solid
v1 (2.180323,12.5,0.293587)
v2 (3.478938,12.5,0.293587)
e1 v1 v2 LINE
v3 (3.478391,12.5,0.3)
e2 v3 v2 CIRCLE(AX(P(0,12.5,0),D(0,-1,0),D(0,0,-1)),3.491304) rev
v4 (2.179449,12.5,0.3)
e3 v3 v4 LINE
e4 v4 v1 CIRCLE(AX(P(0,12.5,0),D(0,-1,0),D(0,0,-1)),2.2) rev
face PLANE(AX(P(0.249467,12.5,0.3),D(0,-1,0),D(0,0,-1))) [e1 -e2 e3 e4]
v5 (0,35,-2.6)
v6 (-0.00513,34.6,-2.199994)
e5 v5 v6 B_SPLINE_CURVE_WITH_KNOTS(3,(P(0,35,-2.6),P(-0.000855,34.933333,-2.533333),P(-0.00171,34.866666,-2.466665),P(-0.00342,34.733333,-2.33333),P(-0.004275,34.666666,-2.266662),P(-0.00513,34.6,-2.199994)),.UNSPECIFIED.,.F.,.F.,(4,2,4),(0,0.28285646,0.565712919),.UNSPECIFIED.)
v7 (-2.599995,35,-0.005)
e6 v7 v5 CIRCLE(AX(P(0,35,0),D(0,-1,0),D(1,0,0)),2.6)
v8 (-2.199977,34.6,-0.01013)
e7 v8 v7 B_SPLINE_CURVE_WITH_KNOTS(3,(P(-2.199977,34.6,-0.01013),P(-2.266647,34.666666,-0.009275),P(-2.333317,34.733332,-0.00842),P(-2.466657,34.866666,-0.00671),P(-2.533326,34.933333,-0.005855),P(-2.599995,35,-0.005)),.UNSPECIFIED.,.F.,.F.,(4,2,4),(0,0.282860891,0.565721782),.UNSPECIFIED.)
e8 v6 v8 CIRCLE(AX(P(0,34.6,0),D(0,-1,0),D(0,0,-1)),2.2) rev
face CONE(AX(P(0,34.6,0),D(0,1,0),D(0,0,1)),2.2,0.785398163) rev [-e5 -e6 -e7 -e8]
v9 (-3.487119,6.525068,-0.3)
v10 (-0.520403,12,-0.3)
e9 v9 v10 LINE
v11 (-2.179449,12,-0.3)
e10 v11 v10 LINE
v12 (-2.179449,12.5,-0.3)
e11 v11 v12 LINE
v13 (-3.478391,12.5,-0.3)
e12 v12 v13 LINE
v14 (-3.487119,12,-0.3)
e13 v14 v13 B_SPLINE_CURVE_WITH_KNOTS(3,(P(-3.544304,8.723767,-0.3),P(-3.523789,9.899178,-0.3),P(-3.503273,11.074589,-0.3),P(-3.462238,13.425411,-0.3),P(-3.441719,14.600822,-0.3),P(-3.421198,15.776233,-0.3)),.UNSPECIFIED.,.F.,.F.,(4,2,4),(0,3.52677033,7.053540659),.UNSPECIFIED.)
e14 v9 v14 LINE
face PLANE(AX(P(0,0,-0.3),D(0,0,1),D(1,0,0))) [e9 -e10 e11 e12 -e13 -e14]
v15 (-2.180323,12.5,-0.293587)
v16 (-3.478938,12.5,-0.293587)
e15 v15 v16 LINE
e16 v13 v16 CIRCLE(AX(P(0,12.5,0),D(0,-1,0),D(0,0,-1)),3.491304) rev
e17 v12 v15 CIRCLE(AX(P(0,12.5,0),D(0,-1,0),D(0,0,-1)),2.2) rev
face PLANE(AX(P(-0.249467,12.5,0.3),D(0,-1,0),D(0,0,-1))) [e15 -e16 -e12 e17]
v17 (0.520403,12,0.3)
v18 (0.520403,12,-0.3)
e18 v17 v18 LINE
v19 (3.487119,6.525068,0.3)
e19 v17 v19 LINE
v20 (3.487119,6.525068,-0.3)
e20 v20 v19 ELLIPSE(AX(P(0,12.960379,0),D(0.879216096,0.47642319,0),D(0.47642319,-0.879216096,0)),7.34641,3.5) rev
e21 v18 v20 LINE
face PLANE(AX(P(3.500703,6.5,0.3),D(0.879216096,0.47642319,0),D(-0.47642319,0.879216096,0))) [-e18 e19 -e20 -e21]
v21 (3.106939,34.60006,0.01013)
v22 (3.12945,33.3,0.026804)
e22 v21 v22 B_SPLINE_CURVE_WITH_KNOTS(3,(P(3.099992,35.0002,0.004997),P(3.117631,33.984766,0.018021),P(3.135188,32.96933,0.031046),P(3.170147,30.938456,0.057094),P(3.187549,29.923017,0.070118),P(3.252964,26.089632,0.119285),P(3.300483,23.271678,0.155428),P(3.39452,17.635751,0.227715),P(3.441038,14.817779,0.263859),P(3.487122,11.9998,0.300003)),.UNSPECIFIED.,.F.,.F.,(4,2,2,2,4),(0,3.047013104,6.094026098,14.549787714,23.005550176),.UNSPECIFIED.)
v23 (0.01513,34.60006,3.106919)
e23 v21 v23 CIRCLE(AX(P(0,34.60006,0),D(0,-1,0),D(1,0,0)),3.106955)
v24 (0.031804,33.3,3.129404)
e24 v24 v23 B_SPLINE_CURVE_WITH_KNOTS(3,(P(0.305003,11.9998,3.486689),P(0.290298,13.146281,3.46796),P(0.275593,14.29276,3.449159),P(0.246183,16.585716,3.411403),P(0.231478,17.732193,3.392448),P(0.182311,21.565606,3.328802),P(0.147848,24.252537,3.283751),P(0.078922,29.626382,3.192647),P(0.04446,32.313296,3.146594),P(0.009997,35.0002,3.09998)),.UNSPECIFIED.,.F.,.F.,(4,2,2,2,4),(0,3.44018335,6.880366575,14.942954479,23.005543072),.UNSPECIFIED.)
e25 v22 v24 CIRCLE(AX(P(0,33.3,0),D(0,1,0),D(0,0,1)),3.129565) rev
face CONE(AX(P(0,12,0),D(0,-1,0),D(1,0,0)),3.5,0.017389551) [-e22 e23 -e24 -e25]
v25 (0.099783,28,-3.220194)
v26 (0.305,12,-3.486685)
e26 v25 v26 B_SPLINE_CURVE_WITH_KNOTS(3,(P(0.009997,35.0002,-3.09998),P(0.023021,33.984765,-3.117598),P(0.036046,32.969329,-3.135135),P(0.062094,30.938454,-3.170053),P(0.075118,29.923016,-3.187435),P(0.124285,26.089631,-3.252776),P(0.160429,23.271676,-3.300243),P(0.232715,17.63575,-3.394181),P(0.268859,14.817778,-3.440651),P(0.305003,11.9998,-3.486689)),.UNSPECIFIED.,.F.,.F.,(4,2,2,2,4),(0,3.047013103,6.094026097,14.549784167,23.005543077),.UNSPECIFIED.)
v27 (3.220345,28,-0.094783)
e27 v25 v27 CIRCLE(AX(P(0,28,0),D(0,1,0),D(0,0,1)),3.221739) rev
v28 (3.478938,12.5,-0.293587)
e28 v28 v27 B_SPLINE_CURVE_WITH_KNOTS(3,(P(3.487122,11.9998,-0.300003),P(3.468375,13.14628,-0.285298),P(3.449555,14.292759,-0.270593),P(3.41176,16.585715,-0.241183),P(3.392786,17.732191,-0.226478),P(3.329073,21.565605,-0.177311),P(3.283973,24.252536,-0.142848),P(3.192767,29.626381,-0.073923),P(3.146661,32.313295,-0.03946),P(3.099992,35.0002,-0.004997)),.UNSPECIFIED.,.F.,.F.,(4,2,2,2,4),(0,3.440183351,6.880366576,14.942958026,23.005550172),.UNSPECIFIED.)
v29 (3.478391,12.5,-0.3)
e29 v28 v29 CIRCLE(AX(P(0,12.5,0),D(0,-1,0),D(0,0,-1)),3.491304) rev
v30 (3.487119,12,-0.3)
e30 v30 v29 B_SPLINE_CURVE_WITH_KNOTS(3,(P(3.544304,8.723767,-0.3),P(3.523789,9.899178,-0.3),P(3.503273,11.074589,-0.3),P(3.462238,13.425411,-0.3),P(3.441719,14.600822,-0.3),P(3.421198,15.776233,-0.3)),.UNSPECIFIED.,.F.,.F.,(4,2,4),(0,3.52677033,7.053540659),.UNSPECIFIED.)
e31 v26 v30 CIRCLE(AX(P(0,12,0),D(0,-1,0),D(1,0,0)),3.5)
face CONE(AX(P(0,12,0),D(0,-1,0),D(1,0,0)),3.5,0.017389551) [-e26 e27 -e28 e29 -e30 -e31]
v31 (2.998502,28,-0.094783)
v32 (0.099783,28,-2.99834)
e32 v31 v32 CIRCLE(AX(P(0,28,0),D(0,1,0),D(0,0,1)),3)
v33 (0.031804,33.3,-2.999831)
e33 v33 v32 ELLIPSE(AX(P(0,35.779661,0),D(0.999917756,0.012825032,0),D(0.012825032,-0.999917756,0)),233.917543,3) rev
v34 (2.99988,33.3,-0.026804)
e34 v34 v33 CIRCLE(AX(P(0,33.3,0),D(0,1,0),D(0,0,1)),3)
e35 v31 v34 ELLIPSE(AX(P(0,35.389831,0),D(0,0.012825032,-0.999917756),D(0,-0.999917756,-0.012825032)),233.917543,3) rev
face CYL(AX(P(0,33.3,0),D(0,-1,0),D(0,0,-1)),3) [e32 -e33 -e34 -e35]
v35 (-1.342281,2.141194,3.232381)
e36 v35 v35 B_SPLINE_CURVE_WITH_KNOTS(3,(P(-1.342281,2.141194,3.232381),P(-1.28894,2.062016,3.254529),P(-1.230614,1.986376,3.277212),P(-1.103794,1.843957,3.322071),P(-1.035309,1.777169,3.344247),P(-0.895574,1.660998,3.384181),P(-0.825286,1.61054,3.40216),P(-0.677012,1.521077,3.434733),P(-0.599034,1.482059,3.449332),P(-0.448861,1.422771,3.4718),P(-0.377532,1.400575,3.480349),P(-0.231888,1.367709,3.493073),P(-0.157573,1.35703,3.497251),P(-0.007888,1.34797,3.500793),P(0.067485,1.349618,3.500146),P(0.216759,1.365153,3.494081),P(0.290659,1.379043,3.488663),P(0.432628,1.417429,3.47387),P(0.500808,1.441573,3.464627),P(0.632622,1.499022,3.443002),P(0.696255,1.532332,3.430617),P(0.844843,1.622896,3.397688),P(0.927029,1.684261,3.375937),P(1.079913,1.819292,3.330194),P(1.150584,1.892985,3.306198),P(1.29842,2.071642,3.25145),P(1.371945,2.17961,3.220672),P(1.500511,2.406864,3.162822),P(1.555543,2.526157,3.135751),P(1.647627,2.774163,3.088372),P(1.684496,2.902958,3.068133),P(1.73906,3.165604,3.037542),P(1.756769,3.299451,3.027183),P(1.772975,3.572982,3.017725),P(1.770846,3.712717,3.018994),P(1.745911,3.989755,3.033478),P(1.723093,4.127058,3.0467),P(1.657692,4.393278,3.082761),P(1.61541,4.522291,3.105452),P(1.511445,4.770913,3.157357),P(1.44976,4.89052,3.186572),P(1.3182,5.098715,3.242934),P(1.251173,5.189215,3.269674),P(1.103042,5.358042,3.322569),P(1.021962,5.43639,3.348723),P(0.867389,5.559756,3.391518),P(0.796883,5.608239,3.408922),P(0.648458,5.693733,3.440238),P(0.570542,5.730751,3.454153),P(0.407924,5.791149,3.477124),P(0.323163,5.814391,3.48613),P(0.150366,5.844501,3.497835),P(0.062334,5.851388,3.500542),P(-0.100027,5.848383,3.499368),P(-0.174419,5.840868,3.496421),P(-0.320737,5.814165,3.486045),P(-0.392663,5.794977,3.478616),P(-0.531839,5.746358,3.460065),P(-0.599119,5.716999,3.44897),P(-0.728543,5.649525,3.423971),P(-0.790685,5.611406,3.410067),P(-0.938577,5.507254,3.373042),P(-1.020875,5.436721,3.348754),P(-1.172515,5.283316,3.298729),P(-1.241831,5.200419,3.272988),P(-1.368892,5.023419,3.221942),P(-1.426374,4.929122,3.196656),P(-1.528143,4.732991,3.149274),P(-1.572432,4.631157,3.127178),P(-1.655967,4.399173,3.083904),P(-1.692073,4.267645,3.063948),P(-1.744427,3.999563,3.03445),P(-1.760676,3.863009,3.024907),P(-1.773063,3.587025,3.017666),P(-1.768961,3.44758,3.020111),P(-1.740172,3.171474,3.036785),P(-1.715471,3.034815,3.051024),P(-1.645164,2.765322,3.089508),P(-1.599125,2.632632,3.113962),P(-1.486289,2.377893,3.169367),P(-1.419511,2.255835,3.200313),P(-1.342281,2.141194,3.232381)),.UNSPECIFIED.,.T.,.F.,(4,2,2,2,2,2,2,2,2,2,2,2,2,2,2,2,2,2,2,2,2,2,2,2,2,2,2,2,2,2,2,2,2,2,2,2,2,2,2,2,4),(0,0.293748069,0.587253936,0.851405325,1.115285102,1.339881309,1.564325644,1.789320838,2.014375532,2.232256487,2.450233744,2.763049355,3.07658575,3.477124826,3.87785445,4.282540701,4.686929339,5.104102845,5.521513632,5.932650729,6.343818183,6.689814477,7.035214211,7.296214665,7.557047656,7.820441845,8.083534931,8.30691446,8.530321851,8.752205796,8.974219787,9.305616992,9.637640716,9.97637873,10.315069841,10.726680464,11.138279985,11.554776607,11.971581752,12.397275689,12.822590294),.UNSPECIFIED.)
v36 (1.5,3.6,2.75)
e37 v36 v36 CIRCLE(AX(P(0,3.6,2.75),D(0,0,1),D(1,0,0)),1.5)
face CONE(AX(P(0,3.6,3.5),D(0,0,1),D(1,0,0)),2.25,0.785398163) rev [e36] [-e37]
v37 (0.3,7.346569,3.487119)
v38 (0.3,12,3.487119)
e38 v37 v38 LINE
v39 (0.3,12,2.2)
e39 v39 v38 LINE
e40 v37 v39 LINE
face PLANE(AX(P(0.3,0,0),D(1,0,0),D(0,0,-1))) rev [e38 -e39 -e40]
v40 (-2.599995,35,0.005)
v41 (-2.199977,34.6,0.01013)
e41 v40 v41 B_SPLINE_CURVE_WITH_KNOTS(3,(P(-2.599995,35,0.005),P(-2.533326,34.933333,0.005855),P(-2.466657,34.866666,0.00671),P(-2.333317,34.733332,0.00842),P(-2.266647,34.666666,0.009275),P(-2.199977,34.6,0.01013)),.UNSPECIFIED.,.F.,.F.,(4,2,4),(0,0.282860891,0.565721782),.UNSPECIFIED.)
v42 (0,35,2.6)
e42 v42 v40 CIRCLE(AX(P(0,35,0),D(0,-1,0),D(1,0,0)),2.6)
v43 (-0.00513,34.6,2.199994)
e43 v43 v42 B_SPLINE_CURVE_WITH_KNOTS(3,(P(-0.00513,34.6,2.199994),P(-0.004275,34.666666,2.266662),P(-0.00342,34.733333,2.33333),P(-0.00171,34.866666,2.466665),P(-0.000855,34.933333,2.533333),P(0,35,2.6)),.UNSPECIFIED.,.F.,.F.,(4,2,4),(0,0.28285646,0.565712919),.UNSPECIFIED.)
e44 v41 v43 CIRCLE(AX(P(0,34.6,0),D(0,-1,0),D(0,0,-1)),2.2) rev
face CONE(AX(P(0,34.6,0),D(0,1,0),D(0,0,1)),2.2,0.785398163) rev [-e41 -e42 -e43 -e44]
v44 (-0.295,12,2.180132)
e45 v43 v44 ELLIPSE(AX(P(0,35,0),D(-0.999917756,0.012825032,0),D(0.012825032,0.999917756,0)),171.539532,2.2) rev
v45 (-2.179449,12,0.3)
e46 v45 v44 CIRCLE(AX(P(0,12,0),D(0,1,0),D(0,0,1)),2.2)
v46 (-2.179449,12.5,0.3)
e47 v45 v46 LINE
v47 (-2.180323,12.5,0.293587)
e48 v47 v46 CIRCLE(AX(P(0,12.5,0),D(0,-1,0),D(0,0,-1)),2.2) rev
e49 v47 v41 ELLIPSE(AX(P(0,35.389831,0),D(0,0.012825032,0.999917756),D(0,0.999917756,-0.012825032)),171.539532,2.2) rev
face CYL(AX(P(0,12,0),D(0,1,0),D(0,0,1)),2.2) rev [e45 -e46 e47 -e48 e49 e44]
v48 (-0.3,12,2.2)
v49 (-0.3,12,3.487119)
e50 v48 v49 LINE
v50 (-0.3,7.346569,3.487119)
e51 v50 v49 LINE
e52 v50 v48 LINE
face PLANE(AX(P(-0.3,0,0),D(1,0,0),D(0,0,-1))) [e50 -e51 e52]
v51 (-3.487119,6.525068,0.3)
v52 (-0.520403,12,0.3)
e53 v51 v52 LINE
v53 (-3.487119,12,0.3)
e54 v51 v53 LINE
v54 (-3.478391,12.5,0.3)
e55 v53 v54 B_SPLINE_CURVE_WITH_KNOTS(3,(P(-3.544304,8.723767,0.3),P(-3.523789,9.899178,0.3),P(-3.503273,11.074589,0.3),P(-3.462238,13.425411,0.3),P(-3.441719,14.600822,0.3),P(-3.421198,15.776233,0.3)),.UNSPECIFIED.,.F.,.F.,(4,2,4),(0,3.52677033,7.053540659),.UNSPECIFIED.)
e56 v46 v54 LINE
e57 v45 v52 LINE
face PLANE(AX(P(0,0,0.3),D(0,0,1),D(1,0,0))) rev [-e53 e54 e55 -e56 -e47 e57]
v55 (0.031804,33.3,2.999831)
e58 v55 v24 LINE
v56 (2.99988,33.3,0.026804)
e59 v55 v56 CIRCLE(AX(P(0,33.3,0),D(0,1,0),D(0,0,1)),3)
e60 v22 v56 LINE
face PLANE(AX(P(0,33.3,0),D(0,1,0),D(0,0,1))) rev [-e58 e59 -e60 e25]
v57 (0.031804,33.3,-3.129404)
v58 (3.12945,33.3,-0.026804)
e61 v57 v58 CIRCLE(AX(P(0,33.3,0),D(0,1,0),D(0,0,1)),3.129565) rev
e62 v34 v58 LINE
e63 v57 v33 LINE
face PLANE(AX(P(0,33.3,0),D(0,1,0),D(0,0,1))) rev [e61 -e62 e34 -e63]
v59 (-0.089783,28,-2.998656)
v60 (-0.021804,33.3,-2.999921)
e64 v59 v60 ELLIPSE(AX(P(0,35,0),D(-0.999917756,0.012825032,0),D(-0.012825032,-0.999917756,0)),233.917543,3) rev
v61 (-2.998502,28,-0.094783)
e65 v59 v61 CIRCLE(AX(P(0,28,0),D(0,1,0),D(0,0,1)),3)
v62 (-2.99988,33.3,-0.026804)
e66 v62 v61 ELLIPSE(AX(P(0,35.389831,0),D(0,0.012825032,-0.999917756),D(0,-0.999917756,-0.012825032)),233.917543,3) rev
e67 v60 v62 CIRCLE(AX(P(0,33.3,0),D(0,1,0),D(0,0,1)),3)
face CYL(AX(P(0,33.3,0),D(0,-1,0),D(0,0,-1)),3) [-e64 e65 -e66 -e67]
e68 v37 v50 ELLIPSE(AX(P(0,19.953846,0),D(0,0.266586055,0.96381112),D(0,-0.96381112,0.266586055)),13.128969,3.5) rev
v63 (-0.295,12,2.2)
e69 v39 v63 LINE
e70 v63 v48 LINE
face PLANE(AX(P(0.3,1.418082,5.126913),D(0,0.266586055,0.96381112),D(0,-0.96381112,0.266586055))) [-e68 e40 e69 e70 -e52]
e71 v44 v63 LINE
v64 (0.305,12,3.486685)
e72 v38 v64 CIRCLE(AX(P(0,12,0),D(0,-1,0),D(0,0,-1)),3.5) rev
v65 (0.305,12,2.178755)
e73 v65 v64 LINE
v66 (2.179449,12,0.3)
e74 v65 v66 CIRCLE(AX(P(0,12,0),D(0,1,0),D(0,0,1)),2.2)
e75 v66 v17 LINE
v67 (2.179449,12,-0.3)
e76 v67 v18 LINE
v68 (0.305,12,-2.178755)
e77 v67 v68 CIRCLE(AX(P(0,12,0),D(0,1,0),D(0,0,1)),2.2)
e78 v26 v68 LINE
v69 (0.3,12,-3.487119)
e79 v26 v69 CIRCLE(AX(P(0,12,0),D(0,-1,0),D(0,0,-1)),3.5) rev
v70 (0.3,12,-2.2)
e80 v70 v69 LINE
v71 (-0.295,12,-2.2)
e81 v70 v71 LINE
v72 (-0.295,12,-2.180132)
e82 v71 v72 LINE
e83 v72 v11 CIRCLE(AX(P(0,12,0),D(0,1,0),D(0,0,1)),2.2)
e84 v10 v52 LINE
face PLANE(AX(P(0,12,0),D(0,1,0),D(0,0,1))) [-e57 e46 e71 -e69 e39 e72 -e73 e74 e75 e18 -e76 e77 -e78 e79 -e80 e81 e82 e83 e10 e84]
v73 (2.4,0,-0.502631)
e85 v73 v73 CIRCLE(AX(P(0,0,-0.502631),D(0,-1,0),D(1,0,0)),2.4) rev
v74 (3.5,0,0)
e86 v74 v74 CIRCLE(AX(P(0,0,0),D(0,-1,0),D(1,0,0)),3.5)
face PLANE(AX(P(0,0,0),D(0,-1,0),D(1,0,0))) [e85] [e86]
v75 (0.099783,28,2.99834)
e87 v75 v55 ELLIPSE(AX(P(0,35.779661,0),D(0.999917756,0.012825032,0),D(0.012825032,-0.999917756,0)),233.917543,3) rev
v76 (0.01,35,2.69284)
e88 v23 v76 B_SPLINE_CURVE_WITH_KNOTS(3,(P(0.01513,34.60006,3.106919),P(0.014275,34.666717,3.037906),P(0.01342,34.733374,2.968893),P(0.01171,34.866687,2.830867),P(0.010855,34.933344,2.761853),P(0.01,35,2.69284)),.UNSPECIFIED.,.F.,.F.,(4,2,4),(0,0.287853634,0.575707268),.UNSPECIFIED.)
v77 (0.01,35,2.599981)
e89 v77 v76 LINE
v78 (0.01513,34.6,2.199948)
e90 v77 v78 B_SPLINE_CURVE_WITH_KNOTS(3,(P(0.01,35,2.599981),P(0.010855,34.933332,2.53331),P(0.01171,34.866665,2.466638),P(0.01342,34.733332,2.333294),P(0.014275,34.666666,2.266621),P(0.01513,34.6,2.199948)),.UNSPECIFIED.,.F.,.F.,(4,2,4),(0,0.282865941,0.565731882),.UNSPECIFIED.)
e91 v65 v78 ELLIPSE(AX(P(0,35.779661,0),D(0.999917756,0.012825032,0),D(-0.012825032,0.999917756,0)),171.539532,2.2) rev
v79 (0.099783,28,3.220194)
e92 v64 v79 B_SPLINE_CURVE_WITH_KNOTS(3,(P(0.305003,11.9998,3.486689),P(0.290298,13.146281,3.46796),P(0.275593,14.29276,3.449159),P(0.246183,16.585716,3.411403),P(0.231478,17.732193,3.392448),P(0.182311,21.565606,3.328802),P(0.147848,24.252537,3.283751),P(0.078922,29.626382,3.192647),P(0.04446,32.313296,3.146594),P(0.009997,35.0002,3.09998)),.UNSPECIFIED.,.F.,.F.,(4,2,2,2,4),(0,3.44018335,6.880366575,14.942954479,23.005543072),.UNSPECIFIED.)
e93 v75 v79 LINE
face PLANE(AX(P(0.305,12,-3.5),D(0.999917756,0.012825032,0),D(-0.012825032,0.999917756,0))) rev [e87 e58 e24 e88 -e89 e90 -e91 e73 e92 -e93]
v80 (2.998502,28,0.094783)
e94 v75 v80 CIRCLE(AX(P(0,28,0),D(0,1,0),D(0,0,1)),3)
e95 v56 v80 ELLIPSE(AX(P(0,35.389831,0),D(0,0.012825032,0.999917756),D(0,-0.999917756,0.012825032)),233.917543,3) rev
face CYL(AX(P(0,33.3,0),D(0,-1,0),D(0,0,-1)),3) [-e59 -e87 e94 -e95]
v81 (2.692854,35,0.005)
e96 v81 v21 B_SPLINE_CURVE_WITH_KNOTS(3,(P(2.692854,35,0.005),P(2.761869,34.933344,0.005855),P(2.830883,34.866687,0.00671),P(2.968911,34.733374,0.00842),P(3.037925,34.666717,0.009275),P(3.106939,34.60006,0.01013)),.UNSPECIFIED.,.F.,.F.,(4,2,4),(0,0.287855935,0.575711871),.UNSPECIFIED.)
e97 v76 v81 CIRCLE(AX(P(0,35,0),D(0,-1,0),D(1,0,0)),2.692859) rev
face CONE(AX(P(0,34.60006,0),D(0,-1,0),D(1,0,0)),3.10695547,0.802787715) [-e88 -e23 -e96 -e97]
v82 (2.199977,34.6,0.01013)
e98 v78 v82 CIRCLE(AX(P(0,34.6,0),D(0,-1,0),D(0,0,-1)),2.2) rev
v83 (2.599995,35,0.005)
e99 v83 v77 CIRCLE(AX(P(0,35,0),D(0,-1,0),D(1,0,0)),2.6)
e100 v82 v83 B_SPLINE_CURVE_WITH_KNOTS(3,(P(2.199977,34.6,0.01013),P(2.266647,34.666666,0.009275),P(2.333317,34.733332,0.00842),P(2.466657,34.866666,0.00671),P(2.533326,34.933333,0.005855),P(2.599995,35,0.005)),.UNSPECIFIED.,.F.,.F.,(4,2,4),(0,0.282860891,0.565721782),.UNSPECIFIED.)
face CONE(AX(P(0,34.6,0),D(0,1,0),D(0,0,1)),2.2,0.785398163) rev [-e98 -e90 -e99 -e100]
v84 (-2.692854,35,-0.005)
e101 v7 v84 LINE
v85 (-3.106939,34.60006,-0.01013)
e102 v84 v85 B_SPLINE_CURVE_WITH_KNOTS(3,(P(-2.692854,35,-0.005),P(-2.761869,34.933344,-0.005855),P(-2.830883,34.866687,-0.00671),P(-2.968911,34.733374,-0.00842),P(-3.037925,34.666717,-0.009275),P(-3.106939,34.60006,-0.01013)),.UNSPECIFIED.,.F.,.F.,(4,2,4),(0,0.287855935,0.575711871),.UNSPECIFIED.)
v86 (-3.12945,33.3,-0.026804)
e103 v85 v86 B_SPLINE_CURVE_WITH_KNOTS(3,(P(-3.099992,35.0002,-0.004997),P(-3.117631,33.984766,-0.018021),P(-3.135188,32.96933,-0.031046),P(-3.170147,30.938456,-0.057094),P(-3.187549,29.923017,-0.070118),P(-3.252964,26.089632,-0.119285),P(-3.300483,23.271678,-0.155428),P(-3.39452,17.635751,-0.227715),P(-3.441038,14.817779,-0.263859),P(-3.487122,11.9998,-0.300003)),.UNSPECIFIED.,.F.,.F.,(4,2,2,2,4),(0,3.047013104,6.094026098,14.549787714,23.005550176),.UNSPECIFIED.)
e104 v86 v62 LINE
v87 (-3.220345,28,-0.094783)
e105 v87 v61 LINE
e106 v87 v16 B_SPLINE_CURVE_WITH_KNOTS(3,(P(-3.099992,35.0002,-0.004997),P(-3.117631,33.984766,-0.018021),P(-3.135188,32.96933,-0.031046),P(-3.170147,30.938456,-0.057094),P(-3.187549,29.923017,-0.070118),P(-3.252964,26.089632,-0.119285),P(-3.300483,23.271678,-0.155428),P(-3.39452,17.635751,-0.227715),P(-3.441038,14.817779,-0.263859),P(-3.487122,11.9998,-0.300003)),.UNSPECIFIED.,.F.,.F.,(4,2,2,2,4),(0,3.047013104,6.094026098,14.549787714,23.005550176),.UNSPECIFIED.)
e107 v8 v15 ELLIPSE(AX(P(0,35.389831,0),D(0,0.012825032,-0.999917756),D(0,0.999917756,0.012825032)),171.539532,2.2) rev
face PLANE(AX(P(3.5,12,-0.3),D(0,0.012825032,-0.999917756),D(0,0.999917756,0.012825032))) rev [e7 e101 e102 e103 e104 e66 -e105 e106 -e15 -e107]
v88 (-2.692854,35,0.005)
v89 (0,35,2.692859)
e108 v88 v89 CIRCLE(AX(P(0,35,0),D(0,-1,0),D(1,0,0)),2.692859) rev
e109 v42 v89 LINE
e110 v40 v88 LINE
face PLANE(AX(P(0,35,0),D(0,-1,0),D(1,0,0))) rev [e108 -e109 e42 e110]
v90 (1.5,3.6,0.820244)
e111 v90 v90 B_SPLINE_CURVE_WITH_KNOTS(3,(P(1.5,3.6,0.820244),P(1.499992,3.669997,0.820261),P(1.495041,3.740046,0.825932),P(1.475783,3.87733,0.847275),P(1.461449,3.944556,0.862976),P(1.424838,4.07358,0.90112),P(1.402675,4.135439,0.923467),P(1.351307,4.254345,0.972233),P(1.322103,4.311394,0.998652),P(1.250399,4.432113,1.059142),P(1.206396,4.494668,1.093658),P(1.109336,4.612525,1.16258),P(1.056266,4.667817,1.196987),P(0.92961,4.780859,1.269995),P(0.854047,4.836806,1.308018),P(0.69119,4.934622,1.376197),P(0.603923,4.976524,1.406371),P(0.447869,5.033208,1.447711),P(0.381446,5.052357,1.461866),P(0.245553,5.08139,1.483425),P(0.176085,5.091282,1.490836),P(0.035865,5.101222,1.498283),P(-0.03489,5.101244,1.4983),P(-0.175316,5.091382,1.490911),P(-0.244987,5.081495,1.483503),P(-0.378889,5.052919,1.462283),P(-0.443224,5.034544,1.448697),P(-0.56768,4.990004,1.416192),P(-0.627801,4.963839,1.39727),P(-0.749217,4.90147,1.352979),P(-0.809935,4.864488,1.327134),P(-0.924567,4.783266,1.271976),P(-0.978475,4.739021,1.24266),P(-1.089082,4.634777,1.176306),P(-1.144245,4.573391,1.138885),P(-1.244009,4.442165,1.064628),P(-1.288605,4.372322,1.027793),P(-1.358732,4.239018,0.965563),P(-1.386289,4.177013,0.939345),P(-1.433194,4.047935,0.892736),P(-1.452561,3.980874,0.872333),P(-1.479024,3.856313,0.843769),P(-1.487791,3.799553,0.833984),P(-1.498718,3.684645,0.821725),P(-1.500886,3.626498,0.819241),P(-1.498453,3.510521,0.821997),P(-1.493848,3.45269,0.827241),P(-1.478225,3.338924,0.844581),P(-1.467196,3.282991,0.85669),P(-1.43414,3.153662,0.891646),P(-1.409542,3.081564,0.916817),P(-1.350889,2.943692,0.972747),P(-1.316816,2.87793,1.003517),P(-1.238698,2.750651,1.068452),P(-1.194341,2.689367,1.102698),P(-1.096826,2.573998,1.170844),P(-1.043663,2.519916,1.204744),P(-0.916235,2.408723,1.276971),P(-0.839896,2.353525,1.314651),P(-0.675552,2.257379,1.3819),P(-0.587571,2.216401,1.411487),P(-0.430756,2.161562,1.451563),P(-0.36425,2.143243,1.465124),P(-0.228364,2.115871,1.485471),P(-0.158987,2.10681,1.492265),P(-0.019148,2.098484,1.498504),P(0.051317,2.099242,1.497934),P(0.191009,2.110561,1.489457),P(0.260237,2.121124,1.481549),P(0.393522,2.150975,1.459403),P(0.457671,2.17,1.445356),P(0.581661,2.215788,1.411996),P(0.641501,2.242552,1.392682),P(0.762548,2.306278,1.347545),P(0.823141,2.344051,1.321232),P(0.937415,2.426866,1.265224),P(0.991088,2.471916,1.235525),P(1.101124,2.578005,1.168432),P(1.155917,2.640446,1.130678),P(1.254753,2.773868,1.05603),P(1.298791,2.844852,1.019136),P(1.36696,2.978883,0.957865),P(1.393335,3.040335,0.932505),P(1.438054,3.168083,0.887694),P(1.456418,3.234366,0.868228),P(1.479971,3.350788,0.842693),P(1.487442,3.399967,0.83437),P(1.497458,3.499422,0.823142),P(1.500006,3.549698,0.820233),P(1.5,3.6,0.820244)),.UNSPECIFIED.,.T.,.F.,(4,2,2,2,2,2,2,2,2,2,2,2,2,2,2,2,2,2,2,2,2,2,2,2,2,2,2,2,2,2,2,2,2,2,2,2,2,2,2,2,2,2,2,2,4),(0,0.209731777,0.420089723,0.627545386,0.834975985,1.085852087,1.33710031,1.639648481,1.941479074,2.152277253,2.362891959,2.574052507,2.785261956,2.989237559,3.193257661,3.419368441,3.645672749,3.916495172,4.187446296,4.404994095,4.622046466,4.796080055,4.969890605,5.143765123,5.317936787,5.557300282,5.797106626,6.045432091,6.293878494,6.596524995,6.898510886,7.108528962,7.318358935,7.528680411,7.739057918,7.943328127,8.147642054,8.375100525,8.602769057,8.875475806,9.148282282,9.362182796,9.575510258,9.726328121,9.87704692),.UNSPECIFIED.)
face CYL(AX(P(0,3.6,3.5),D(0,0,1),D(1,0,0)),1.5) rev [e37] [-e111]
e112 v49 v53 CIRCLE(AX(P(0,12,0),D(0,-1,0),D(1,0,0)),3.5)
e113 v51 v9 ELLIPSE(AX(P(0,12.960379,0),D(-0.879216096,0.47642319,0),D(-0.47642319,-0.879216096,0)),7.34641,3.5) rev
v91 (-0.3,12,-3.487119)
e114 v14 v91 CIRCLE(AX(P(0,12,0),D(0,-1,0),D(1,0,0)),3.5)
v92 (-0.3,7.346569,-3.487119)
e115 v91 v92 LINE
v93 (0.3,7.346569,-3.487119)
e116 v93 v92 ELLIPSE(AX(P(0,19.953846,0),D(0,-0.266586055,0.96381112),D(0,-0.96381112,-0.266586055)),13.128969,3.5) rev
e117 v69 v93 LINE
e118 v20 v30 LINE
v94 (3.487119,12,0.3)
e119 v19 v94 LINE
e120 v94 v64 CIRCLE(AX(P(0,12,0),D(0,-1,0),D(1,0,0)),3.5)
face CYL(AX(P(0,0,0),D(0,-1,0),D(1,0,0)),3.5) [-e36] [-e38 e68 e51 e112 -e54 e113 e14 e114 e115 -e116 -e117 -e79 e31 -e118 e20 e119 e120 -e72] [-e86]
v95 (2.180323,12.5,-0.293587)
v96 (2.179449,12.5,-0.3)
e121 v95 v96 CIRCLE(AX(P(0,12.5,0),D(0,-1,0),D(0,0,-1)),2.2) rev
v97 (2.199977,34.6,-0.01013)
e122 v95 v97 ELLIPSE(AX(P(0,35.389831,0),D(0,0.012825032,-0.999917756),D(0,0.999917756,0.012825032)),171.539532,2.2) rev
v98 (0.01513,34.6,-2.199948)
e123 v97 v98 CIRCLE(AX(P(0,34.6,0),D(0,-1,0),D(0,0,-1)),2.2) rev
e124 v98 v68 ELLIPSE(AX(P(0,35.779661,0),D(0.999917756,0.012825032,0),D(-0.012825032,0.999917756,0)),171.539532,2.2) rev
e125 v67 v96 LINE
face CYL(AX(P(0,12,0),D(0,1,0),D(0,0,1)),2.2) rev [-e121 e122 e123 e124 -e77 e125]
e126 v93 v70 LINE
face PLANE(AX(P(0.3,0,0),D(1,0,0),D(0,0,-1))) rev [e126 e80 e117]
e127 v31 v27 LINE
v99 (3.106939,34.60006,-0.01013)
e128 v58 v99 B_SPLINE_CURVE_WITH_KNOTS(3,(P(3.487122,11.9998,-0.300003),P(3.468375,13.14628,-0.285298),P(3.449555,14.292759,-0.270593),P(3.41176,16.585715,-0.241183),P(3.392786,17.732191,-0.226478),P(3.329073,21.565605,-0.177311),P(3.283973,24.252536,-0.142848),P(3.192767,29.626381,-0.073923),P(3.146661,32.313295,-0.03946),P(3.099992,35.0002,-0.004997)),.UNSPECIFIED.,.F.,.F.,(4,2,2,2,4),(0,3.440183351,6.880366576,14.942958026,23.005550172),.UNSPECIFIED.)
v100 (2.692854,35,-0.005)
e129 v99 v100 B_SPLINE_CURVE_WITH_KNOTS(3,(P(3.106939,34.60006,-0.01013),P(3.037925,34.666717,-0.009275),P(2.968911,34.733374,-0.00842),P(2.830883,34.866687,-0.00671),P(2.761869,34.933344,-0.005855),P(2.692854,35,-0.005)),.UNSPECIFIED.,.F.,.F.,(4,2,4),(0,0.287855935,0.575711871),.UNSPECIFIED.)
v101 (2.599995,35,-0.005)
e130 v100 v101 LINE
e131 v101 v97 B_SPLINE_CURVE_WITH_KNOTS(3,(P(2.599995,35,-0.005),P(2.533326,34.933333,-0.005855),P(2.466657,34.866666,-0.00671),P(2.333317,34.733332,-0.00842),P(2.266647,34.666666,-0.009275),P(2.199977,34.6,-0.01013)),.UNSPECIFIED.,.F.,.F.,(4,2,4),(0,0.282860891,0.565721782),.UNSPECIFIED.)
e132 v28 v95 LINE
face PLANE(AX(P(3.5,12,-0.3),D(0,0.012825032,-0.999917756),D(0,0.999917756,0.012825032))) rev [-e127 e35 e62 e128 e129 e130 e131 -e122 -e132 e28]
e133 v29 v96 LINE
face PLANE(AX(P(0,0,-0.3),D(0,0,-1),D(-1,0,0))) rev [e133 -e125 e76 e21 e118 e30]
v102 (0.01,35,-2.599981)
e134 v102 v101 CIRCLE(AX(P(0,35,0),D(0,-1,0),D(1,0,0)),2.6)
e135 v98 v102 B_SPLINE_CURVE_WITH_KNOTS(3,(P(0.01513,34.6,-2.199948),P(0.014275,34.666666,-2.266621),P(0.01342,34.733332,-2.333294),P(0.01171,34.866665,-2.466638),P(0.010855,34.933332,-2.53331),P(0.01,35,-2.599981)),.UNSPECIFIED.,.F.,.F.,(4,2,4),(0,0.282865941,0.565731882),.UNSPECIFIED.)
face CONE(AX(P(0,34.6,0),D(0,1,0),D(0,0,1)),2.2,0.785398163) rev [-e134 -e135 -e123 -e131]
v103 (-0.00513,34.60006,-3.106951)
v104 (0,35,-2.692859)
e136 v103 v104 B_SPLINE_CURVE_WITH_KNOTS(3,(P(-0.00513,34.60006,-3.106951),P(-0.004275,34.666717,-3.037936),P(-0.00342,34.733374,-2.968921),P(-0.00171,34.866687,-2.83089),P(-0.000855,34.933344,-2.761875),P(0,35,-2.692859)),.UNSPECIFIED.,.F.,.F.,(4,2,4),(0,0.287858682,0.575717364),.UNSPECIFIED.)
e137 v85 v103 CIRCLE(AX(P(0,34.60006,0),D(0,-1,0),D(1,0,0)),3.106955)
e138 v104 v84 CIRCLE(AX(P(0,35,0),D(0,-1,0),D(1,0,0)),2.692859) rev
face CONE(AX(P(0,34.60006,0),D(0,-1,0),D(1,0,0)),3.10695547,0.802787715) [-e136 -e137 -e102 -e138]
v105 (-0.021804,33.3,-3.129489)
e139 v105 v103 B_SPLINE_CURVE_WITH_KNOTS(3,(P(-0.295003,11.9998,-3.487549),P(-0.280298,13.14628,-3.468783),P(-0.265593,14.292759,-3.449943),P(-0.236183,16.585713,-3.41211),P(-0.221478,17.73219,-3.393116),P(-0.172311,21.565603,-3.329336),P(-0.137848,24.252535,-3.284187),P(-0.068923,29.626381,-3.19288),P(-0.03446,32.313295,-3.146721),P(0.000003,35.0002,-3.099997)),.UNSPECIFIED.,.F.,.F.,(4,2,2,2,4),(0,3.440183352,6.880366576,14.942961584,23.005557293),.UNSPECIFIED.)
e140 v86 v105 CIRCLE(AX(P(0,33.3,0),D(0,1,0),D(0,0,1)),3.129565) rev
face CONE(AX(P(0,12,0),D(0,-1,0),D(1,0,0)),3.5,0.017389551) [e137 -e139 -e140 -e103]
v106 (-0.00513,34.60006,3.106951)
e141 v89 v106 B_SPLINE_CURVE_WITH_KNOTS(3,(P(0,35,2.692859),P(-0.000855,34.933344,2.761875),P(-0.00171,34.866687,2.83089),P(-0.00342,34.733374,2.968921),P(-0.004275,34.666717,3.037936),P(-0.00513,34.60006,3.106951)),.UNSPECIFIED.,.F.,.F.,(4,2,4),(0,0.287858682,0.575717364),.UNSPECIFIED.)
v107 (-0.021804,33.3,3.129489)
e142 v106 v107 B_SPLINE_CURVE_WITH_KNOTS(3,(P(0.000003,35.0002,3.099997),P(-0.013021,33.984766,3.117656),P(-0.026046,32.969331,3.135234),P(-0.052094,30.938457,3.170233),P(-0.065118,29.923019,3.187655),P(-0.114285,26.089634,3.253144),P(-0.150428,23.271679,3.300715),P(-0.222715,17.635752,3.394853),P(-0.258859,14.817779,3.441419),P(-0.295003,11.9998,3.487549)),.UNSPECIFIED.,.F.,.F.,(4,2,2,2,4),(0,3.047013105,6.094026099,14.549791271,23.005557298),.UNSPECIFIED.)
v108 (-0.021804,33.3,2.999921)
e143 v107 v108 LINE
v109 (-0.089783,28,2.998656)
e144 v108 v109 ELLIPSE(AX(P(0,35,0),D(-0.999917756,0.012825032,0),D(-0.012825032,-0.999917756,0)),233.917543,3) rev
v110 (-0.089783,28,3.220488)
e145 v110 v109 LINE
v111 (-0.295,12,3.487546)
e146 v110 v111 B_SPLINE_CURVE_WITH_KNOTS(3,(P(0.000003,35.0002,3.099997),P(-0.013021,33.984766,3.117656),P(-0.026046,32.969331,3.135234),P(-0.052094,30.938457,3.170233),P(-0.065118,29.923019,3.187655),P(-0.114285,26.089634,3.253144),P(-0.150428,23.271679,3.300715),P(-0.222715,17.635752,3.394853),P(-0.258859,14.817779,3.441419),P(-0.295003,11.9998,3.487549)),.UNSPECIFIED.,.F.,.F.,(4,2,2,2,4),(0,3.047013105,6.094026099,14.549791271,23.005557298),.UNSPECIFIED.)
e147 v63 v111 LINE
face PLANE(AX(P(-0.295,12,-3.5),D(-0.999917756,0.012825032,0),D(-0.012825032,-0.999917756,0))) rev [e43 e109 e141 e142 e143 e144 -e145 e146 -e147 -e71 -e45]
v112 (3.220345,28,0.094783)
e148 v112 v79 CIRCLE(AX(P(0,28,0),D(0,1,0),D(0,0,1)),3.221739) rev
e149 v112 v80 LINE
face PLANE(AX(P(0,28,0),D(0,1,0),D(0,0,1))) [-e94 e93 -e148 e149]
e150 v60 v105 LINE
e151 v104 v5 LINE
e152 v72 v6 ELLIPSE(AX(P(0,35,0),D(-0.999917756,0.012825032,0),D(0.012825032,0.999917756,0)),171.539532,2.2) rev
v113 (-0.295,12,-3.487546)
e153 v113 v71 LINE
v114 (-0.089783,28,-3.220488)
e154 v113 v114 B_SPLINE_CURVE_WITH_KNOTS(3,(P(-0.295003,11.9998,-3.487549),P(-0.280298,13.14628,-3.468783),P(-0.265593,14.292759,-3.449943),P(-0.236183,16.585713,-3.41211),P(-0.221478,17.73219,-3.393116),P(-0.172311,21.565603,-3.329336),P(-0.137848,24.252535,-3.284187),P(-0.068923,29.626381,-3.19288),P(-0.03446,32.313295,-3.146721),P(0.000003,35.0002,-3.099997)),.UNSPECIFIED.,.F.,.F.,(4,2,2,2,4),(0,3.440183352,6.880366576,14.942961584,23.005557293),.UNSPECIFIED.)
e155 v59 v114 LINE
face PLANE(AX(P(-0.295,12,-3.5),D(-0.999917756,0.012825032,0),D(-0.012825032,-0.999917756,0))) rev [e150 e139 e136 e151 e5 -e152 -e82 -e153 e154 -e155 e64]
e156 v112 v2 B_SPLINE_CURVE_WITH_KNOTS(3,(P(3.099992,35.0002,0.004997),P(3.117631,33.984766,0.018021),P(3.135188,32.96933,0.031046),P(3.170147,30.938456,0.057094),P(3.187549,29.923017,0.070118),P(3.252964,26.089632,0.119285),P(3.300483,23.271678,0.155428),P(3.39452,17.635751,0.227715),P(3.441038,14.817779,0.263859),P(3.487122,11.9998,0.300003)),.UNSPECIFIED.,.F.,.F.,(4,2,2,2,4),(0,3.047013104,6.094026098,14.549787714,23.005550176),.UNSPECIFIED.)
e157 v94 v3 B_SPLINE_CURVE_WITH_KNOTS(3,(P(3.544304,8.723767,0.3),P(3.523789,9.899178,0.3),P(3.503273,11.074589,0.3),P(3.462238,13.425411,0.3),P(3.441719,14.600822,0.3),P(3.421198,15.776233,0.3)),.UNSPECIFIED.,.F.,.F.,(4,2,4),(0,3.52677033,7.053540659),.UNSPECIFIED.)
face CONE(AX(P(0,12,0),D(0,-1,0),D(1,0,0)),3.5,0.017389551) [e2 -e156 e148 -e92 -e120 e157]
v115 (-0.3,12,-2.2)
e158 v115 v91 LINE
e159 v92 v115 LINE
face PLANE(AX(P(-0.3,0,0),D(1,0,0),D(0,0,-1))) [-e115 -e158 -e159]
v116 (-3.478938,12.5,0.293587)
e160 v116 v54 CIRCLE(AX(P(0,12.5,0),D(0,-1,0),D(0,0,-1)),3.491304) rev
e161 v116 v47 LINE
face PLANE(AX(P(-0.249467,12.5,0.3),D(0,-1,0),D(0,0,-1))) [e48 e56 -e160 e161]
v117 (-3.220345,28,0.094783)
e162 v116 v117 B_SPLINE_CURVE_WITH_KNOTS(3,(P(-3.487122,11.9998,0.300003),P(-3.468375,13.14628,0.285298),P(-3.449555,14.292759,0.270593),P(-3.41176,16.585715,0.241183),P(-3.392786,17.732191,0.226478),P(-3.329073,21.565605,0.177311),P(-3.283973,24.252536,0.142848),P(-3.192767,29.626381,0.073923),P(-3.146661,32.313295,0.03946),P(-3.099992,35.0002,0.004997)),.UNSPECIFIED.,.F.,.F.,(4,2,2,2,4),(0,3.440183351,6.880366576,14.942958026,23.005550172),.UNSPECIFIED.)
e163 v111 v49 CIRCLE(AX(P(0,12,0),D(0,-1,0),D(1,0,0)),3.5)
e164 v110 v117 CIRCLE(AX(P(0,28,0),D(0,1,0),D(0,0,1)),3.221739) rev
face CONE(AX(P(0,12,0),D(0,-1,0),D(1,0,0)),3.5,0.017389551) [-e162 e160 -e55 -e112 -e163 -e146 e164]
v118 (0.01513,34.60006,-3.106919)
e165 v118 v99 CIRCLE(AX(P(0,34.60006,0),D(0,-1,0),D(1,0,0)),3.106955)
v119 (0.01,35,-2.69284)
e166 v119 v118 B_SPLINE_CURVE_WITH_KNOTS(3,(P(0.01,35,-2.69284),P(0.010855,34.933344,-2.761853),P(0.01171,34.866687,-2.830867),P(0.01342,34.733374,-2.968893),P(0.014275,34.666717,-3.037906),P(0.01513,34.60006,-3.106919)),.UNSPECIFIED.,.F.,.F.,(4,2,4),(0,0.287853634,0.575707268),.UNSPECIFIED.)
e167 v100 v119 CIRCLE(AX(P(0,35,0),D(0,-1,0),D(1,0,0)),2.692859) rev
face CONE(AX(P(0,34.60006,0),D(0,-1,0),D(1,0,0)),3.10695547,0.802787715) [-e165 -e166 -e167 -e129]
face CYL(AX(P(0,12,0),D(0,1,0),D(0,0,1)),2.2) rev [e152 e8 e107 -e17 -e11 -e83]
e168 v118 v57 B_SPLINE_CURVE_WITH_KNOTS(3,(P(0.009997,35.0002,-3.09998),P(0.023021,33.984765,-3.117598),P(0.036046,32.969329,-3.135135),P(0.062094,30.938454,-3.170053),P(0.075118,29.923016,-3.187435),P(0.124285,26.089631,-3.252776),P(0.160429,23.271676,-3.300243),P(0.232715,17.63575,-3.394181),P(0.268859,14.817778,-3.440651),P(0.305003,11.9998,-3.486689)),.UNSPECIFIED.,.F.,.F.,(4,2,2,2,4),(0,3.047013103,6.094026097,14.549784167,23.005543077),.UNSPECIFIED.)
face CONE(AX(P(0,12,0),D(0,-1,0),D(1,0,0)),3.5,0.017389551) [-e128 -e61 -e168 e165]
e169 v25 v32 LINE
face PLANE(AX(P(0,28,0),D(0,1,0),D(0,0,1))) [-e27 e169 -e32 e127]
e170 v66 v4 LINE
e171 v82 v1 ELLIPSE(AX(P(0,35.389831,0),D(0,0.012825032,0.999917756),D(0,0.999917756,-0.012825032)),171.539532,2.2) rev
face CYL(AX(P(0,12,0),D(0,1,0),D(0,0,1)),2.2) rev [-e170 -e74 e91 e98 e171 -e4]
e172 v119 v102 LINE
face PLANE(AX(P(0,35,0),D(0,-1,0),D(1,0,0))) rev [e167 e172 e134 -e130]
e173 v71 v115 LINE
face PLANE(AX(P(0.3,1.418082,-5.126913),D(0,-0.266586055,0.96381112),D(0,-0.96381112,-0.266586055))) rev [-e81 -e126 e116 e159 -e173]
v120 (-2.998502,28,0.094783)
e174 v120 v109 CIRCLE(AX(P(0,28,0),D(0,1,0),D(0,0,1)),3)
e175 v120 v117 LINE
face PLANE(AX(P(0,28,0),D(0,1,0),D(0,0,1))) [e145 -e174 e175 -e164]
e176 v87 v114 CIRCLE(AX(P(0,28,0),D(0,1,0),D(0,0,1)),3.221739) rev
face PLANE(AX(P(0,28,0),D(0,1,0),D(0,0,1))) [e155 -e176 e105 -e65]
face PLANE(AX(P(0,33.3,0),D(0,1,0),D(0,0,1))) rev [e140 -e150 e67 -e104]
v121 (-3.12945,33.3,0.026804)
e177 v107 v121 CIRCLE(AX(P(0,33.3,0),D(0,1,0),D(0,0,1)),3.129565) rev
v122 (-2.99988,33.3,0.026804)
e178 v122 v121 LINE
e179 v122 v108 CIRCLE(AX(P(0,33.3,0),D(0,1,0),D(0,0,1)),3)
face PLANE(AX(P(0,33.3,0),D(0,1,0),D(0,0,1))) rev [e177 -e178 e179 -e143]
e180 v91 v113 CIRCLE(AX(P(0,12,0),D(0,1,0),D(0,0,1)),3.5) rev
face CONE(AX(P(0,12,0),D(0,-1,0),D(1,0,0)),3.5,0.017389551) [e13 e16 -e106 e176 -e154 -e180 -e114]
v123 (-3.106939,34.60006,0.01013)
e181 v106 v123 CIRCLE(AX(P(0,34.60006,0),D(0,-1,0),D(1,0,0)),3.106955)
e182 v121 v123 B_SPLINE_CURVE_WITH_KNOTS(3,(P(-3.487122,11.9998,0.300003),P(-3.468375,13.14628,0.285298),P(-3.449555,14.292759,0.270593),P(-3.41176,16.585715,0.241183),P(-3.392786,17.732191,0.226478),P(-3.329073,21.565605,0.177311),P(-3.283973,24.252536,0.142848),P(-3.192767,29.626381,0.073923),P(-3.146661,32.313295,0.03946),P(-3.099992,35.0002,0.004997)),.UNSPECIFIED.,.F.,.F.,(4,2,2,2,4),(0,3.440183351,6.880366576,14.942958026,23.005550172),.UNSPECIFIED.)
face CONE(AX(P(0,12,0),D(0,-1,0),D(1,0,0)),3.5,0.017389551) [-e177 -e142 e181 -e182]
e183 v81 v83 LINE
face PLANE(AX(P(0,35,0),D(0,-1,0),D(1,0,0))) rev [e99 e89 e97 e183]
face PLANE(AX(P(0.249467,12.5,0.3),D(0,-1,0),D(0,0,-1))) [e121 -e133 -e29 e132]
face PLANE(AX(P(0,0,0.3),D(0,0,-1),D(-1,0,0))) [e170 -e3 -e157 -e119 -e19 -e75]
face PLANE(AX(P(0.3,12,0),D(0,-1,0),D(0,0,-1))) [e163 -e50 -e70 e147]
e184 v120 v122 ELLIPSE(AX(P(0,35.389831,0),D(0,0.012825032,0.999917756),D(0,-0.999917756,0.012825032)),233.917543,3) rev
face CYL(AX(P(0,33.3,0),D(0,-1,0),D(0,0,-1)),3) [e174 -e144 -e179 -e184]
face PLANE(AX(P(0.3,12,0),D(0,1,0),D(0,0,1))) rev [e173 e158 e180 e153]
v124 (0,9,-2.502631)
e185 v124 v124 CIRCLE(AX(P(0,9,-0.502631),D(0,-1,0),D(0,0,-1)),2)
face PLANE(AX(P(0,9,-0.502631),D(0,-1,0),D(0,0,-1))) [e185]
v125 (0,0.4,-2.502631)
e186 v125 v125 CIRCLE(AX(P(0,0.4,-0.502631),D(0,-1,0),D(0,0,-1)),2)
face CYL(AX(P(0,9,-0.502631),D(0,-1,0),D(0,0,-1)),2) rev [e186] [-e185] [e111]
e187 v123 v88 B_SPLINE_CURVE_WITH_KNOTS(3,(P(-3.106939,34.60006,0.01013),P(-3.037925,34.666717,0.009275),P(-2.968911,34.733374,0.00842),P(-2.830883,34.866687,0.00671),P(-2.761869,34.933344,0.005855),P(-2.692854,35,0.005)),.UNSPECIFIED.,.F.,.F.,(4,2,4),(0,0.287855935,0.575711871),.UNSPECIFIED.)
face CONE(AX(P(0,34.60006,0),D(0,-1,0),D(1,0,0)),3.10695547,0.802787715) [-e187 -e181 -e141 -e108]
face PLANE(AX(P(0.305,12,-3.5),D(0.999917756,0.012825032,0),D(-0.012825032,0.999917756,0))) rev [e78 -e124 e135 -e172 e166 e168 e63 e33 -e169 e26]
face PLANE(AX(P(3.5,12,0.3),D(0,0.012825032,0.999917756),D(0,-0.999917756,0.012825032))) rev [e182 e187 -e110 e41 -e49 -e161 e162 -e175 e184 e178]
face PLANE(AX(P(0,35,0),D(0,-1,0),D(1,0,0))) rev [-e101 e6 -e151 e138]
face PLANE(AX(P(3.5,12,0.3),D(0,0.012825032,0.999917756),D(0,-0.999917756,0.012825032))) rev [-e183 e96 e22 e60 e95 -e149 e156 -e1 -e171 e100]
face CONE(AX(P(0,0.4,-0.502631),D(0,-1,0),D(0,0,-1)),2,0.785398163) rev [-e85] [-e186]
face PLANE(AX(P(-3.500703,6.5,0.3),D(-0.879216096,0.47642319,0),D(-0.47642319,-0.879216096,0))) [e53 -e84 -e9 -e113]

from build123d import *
from OCP.BRepFilletAPI import BRepFilletAPI_MakeChamfer

# Parameters (mm, degrees)
SKETCH1_W               = 3.5
SKETCH1_H               = 12
SKETCH2_R               = 2.2
CUT_EXTRUDE1_DEPTH      = 23
SKETCH3_R               = 2
CUT_EXTRUDE2_DEPTH      = 9
CUT_EXTRUDE3_DEPTH      = 36.864327681
CUT_EXTRUDE4_DEPTH      = 36.864327798
CUT_EXTRUDE5_DEPTH      = 0.3
CUT_EXTRUDE5_DEPTH_BACK = 0.3
CUT_EXTRUDE8_DEPTH      = 0.3
CUT_EXTRUDE8_DEPTH_BACK = 0.3
CUT_EXTRUDE7_START      = 5.3
SKETCH15_R              = 3.5
SKETCH15_R_2            = 3
CUT_EXTRUDE7_DEPTH      = 5.3
CHAMFER1_SIZE           = 0.4
CHAMFER1_SIZE2          = 0.407141204


# Read off the part's stored shape, not the designer's step: CSK for M3 Oval Head Machine Screw1
with BuildPart() as part:
    # Sketch1 → Revolve1 (revolve)
    with BuildSketch(Plane.XY):
        Polygon((0, 12), (3.5, 12), (3.1, 35), (0, 35), align=None)
        with Locations((1.75, 6)):
            Rectangle(SKETCH1_W, SKETCH1_H)
    revolve(axis=Axis((0, 0, 0), (0, 1, 0)))

    # Sketch2 → Cut-Extrude1 (cut)
    with BuildSketch(Plane(origin=(0, 35, 0), x_dir=(1, 0, 0), z_dir=(0, 1, 0))):
        with Locations(Location((0, 0, 0), (0, 0, 270))):
            Circle(SKETCH2_R)
    extrude(amount=-CUT_EXTRUDE1_DEPTH, mode=Mode.SUBTRACT)

    # Sketch3 → Cut-Extrude2 (cut)
    with BuildSketch(Plane.XZ):
        with Locations(Location((0, -0.502631205, 0), (0, 0, 270))):
            Circle(SKETCH3_R)
    extrude(amount=-CUT_EXTRUDE2_DEPTH, mode=Mode.SUBTRACT)

    # Sketch5 → Cut-Extrude3 (cut, through all)
    with BuildSketch(Plane.ZY.offset(3.5)):
        Polygon((0.3, 12), (-0.3, 12), (-0.005, 35), (0.005, 35), align=None)
    extrude(amount=-CUT_EXTRUDE3_DEPTH, mode=Mode.SUBTRACT)

    # Sketch9 → Cut-Extrude4 (cut, through all)
    with BuildSketch(Plane.XY.offset(3.5)):
        Polygon((0.305, 12), (-0.295, 12), (0, 35), (0.01, 35), align=None)
    extrude(amount=-CUT_EXTRUDE4_DEPTH, mode=Mode.SUBTRACT)

    # Sketch11 → Cut-Extrude5 (cut, two sides: drawn at the far end of the back side and taken through both)
    with BuildSketch(Plane.XY.offset(-CUT_EXTRUDE5_DEPTH_BACK)):
        Polygon((-0.249466739, 12.5), (-3.597980128, 12.5), (-3.500702869, 6.5), align=None)
        Polygon((3.597980128, 12.5), (3.500702869, 6.5), (0.249466739, 12.5), align=None)
    extrude(amount=CUT_EXTRUDE5_DEPTH + CUT_EXTRUDE5_DEPTH_BACK, mode=Mode.SUBTRACT)

    # Sketch22 → Cut-Extrude8 (cut, two sides: drawn at the far end of the back side and taken through both)
    with BuildSketch(Plane(origin=(0, 0, 0), x_dir=(0, 0, -1), z_dir=(1, 0, 0)).offset(-CUT_EXTRUDE8_DEPTH_BACK)):
        Polygon((3.5, 7.3), (2.2, 12), (3.618391535, 12), align=None)
        Polygon((-2.2, 12), (-3.5, 12), (-3.5, 7.3), align=None)
    extrude(amount=CUT_EXTRUDE8_DEPTH + CUT_EXTRUDE8_DEPTH_BACK, mode=Mode.SUBTRACT)

    # Sketch15 → Cut-Extrude7 (cut)
    with BuildSketch(Plane(origin=(0, 28, 0), x_dir=(1, 0, 0), z_dir=(0, 1, 0)).offset(CUT_EXTRUDE7_START)):
        Circle(SKETCH15_R)
        Circle(SKETCH15_R_2, mode=Mode.SUBTRACT)
    extrude(amount=-CUT_EXTRUDE7_DEPTH, mode=Mode.SUBTRACT)

    # CSK for M3 Oval Head Machine Screw1 outl → CSK for M3 Oval Head Machine Screw1 (revolve, cut)
    with BuildSketch(Plane.XZ.offset(-3.6)):
        Polygon((0, 0.819848747), (1.5, 0.819848747), (1.5, 2.75), (2.250138013, 3.500138013), (0, 3.500138013), align=None)
    revolve(axis=Axis((0, 3.6, 0), (0, 0, 1)), mode=Mode.SUBTRACT)

    # Chamfer1: one chamfer whose edges measure the first distance from different faces: ONE call of the kernel's chamfer builder (chamfer() names one face for all edges)
    chamfer1_edges_1 = [part.edges().sort_by_distance(p)[0] for p in [
        (-2.190262541, 35, 2.193798076),
    ]]
    chamfer1_side_1 = [part.faces().sort_by_distance(p)[0] for p in [
        (-2.200706991, 34.15, 2.204259386),
    ]]
    chamfer1_edges_2 = [part.edges().sort_by_distance(p)[0] for p in [
        (2.193798081, 35, 2.190262537),
    ]]
    chamfer1_side_2 = [part.faces().sort_by_distance(p)[0] for p in [
        (2.20425939, 34.15, 2.200706986),
    ]]
    chamfer1_edges_3 = [part.edges().sort_by_distance(p)[0] for p in [
        (2.193798081, 35, -2.190262537),
    ]]
    chamfer1_side_3 = [part.faces().sort_by_distance(p)[0] for p in [
        (2.20425939, 34.15, -2.200706986),
    ]]
    chamfer1_edges_4 = [part.edges().sort_by_distance(p)[0] for p in [
        (-2.190262541, 35, -2.193798076),
    ]]
    chamfer1_side_4 = [part.faces().sort_by_distance(p)[0] for p in [
        (-2.200706991, 34.15, -2.204259386),
    ]]
    chamfer1_edges_5 = [part.edges().sort_by_distance(p)[0] for p in [
        (-1.553866146, 35, 1.557401682),
        (1.557401691, 35, 1.553866137),
        (1.557401691, 35, -1.553866137),
        (-1.553866146, 35, -1.557401682),
        (0, 0, 1.497368795),
    ]]
    chamfer1 = BRepFilletAPI_MakeChamfer(part.part.solid().wrapped)
    for e in chamfer1_edges_1:
        chamfer1.Add(CHAMFER1_SIZE, CHAMFER1_SIZE2, e.wrapped, chamfer1_side_1[0].wrapped)  # the first distance lies on this face
    for e in chamfer1_edges_2:
        chamfer1.Add(CHAMFER1_SIZE, CHAMFER1_SIZE2, e.wrapped, chamfer1_side_2[0].wrapped)  # the first distance lies on this face
    for e in chamfer1_edges_3:
        chamfer1.Add(CHAMFER1_SIZE, CHAMFER1_SIZE2, e.wrapped, chamfer1_side_3[0].wrapped)  # the first distance lies on this face
    for e in chamfer1_edges_4:
        chamfer1.Add(CHAMFER1_SIZE, CHAMFER1_SIZE2, e.wrapped, chamfer1_side_4[0].wrapped)  # the first distance lies on this face
    for e in chamfer1_edges_5:
        chamfer1.Add(CHAMFER1_SIZE, e.wrapped)
    add(Compound.cast(chamfer1.Shape()), mode=Mode.REPLACE)


solid = part.part
